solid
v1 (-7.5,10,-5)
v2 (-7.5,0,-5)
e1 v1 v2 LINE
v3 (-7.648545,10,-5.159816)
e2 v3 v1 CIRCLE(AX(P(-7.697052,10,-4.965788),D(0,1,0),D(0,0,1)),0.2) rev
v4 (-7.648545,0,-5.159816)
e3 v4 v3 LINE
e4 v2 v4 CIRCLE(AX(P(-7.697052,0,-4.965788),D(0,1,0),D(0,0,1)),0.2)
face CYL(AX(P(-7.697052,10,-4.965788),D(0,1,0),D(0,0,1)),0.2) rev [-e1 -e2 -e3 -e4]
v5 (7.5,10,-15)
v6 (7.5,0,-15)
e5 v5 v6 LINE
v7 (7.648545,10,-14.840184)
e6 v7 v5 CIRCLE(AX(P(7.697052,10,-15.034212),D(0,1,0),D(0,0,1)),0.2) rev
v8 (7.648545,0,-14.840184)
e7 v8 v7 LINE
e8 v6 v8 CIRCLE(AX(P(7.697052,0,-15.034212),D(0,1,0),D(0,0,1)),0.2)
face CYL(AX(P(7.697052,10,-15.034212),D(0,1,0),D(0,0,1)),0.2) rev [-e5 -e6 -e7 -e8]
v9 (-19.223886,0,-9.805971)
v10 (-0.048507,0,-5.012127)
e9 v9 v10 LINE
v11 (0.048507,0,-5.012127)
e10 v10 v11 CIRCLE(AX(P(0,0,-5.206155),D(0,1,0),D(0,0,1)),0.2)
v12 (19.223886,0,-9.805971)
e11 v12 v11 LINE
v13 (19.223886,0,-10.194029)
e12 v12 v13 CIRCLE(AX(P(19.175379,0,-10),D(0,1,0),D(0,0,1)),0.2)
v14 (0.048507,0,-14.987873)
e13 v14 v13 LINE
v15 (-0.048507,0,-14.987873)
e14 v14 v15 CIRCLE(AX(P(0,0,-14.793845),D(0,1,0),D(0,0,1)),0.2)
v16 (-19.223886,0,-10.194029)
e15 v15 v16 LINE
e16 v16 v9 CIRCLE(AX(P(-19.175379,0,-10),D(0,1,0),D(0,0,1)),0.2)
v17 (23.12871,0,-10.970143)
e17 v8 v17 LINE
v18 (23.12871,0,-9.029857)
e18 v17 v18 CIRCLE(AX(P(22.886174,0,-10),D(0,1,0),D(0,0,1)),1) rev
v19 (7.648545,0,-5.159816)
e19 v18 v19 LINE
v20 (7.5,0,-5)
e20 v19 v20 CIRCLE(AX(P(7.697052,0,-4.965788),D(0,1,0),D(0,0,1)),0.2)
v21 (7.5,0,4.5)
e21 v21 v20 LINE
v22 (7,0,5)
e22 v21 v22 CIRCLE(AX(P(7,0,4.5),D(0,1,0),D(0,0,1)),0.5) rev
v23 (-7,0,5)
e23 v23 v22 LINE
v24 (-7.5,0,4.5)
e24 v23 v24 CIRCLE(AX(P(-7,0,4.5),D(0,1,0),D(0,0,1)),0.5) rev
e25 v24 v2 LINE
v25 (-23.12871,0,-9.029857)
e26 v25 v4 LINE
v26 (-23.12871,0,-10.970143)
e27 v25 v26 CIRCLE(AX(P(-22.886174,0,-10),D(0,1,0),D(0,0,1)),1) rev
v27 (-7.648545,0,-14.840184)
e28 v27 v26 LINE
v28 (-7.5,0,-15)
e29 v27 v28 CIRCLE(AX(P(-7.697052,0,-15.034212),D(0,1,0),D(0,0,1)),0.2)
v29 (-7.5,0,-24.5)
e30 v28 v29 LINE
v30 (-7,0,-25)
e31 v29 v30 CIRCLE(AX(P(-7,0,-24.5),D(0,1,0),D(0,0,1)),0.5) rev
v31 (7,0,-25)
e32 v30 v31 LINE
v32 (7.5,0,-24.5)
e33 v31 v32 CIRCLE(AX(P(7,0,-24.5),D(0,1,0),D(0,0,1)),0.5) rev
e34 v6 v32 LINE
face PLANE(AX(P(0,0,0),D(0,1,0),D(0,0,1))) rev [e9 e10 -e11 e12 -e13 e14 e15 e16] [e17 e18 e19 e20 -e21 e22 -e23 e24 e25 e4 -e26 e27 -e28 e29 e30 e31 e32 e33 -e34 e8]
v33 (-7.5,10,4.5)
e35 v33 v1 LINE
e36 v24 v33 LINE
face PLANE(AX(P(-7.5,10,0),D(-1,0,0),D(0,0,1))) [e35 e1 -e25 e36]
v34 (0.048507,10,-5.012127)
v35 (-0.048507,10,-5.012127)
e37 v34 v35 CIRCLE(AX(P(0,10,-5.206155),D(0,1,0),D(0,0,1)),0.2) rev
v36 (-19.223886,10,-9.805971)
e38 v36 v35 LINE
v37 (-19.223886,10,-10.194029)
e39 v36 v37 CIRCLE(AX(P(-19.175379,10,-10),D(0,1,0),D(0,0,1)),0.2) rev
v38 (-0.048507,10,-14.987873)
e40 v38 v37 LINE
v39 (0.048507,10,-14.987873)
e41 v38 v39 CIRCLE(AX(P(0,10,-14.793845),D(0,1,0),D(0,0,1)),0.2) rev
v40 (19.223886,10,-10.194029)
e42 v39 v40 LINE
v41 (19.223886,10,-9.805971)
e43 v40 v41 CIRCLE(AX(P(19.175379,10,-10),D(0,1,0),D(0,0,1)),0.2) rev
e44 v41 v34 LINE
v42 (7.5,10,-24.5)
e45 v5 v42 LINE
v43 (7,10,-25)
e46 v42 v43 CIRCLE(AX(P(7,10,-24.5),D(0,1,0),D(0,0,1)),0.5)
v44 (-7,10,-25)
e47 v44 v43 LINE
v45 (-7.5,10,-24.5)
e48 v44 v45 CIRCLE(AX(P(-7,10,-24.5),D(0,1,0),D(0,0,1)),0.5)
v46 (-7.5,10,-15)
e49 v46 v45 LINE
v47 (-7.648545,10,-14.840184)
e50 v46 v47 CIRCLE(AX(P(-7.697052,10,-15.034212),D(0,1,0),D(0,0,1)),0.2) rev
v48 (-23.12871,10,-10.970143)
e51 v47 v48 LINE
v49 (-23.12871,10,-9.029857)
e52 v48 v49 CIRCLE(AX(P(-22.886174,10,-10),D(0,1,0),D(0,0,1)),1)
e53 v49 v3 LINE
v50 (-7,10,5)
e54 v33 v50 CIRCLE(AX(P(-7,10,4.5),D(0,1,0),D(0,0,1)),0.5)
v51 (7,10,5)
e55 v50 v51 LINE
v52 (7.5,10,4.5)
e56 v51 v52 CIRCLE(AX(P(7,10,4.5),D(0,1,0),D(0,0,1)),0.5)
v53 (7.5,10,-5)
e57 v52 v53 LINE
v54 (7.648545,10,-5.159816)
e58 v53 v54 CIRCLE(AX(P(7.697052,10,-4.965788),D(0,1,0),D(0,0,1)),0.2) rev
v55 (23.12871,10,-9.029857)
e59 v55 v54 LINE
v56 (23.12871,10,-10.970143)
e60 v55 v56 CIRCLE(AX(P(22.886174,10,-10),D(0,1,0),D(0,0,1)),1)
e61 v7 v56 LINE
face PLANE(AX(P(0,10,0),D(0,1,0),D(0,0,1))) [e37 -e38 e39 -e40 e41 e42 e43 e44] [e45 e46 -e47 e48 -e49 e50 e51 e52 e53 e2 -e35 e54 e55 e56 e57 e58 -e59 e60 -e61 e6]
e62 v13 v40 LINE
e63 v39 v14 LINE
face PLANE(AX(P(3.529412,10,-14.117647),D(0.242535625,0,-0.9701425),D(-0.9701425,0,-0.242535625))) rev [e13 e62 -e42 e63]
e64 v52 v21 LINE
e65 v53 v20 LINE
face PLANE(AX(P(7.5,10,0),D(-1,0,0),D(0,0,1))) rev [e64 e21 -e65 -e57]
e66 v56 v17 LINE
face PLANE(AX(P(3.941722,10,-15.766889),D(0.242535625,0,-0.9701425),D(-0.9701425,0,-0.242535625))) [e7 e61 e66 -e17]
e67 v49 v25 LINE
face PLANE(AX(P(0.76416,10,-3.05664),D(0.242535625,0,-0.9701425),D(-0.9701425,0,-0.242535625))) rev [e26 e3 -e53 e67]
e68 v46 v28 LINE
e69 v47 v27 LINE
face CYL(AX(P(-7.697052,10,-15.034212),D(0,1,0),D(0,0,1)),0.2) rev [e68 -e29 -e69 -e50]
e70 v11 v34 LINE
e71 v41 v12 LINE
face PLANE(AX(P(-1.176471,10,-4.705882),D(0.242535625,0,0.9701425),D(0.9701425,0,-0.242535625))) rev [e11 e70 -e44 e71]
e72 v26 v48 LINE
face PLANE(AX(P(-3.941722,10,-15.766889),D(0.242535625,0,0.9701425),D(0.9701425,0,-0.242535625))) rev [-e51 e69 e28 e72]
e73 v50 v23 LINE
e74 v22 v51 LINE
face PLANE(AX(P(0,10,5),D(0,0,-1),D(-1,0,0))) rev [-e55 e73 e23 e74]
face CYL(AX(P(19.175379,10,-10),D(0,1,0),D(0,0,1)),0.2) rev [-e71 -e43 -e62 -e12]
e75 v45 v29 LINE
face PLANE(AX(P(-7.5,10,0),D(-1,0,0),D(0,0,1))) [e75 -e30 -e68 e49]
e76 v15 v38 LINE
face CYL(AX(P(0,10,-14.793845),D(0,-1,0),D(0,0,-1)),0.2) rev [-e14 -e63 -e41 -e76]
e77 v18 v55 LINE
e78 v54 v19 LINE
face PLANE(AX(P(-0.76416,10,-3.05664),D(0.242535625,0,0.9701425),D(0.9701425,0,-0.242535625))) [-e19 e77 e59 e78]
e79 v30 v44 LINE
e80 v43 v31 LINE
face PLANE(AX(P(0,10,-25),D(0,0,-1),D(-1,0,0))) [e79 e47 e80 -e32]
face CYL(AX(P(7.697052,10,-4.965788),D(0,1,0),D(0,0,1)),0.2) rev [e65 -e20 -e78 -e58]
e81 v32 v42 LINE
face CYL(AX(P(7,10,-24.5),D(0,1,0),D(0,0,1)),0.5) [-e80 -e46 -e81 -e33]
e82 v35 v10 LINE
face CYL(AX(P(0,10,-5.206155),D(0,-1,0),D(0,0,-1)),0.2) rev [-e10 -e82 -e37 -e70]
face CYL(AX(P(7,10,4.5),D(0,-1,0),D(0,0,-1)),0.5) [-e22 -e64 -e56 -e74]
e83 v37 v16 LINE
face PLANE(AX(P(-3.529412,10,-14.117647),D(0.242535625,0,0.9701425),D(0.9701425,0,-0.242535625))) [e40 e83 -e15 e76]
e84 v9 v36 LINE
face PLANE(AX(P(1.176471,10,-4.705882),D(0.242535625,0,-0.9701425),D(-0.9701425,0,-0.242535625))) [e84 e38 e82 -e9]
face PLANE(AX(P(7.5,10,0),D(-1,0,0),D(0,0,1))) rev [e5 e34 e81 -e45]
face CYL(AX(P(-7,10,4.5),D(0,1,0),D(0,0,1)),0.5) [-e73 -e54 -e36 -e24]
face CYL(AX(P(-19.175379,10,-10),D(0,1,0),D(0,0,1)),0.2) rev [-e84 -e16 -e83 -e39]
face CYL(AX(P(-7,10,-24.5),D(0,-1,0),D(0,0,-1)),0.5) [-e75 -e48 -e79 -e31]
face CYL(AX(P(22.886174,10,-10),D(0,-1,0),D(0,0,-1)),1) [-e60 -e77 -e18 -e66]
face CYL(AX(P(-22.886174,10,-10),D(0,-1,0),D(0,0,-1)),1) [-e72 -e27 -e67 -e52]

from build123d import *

# Parameters (mm, degrees)
SKETCH1_W             = 15
SKETCH1_H             = 10
BOSS_EXTRUDE2_DEPTH   = 10
BOSS_EXTRUDE2_2_DEPTH = 10
BOSS_EXTRUDE3_DEPTH   = 10
FILLET1_R             = 0.2
FILLET2_R             = 1
FILLET3_R             = 0.5


with BuildPart() as part:
    # Sketch1 → Boss-Extrude2 (new body)
    with BuildSketch(Plane(origin=(0, 0, 0), x_dir=(1, 0, 0), z_dir=(0, 1, 0))):
        with Locations((0, 20)):
            Rectangle(SKETCH1_W, SKETCH1_H)
    extrude(amount=BOSS_EXTRUDE2_DEPTH)



with BuildPart() as body_2:
    # Sketch1 → Boss-Extrude2 2 (new body)
    with BuildSketch(Plane(origin=(0, 0, 0), x_dir=(1, 0, 0), z_dir=(0, 1, 0))):
        Rectangle(SKETCH1_W, SKETCH1_H)
    extrude(amount=BOSS_EXTRUDE2_2_DEPTH)


with BuildPart() as part_1:
    add(part.part)

    add(body_2.part)  # Boss-Extrude3 merges body 2
    # Sketch1<4> → Boss-Extrude3 (add)
    with BuildSketch(Plane(origin=(0, 0, 0), x_dir=(1, 0, 0), z_dir=(0, 1, 0))):
        Polygon((-20, 10), (0, 15), (-7.009279564, 15), (-27.009279564, 10), (-7.009279564, 5), (0, 5), align=None)
    boss_extrude3 = extrude(amount=BOSS_EXTRUDE3_DEPTH)

    # Mirror1: Boss-Extrude3 across plane
    add(boss_extrude3.mirror(Plane.ZY))

    # Fillet1
    # the kernel refuses this fillet: 0.2 mm, written as the material it adds along each edge
    with BuildSketch(Plane(origin=(7.009279564, 0, -5), x_dir=(1, 0, 0), z_dir=(0, 1, 0)), Plane(origin=(-7.009279564, 0, -15), x_dir=(-1, 0, 0), z_dir=(0, 1, 0))) as fillet1_piece_1:
        with BuildLine():
            CenterArc((0.687772533, -0.034212148), FILLET1_R, 104.036243468, 66.114258118)
            Line((0.639265408, 0.159816352), (0, 0))
            Line((0, 0), (0.490720436, 0))
        make_face()
    extrude(amount=10)
    with BuildSketch(Plane(origin=(7.009279564, 0, -15), x_dir=(1, 0, 0), z_dir=(0, 1, 0)), Plane(origin=(-7.009279564, 0, -5), x_dir=(-1, 0, 0), z_dir=(0, 1, 0))) as fillet1_piece_2:
        with BuildLine():
            CenterArc((0.687772533, 0.034212148), FILLET1_R, 189.849498414, 66.114258118)
            Line((0.639265408, -0.159816352), (0, 0))
            Line((0, 0), (0.490720436, 0))
        make_face()
    extrude(amount=10)
    with BuildSketch(Plane(origin=(0, 0, -5), x_dir=(-0.9701425001453327, 0, -0.24253562503632975), z_dir=(0, 1, 0))) as fillet1_piece_3:
        with BuildLine():
            CenterArc((FILLET1_R * 0.25, -FILLET1_R), FILLET1_R, 90, 28.072486936)
            Line((-FILLET1_R * 0.220588235294, -FILLET1_R * 0.117647058824), (0, 0))
            Line((0, 0), (FILLET1_R * 0.25, 0))
        make_face()
    extrude(amount=10)
    with BuildSketch(Plane(origin=(20, 0, -10), x_dir=(-0.9701425001453313, 0, 0.24253562503633505), z_dir=(0, 1, 0))) as fillet1_piece_4:
        with BuildLine():
            CenterArc((FILLET1_R * 4, -FILLET1_R), FILLET1_R, 90, 151.927513064)
            Line((FILLET1_R * 3.52941176471, -FILLET1_R * 1.88235294118), (0, 0))
            Line((0, 0), (FILLET1_R * 4, 0))
        make_face()
    extrude(amount=10)
    with BuildSketch(Plane(origin=(0, 0, -15), x_dir=(-0.9701425001453277, 0, 0.2425356250363498), z_dir=(0, 1, 0))) as fillet1_piece_5:
        with BuildLine():
            CenterArc((FILLET1_R * 0.25, FILLET1_R), FILLET1_R, 241.927513064, 28.072486936)
            Line((-FILLET1_R * 0.220588235294, FILLET1_R * 0.117647058824), (0, 0))
            Line((0, 0), (FILLET1_R * 0.25, 0))
        make_face()
    extrude(amount=10)
    with BuildSketch(Plane(origin=(-20, 0, -10), x_dir=(0.9701425001453319, 0, 0.24253562503633297), z_dir=(0, 1, 0))) as fillet1_piece_6:
        with BuildLine():
            CenterArc((FILLET1_R * 4, FILLET1_R), FILLET1_R, 118.072486936, 151.927513064)
            Line((FILLET1_R * 3.52941176471, FILLET1_R * 1.88235294118), (0, 0))
            Line((0, 0), (FILLET1_R * 4, 0))
        make_face()
    extrude(amount=10)

    # Fillet2
    fillet2_edges = [part_1.edges().sort_by_distance(p)[0] for p in [
        (-27.009279564, 5, -10),
        (27.009279564, 5, -10),
    ]]
    fillet(fillet2_edges, radius=FILLET2_R)

    # Fillet3
    fillet3_edges = [part_1.edges().sort_by_distance(p)[0] for p in [
        (-7.5, 5, 5),
        (7.5, 5, 5),
        (-7.5, 5, -25),
        (7.5, 5, -25),
    ]]
    fillet(fillet3_edges, radius=FILLET3_R)


solid = part_1.part
